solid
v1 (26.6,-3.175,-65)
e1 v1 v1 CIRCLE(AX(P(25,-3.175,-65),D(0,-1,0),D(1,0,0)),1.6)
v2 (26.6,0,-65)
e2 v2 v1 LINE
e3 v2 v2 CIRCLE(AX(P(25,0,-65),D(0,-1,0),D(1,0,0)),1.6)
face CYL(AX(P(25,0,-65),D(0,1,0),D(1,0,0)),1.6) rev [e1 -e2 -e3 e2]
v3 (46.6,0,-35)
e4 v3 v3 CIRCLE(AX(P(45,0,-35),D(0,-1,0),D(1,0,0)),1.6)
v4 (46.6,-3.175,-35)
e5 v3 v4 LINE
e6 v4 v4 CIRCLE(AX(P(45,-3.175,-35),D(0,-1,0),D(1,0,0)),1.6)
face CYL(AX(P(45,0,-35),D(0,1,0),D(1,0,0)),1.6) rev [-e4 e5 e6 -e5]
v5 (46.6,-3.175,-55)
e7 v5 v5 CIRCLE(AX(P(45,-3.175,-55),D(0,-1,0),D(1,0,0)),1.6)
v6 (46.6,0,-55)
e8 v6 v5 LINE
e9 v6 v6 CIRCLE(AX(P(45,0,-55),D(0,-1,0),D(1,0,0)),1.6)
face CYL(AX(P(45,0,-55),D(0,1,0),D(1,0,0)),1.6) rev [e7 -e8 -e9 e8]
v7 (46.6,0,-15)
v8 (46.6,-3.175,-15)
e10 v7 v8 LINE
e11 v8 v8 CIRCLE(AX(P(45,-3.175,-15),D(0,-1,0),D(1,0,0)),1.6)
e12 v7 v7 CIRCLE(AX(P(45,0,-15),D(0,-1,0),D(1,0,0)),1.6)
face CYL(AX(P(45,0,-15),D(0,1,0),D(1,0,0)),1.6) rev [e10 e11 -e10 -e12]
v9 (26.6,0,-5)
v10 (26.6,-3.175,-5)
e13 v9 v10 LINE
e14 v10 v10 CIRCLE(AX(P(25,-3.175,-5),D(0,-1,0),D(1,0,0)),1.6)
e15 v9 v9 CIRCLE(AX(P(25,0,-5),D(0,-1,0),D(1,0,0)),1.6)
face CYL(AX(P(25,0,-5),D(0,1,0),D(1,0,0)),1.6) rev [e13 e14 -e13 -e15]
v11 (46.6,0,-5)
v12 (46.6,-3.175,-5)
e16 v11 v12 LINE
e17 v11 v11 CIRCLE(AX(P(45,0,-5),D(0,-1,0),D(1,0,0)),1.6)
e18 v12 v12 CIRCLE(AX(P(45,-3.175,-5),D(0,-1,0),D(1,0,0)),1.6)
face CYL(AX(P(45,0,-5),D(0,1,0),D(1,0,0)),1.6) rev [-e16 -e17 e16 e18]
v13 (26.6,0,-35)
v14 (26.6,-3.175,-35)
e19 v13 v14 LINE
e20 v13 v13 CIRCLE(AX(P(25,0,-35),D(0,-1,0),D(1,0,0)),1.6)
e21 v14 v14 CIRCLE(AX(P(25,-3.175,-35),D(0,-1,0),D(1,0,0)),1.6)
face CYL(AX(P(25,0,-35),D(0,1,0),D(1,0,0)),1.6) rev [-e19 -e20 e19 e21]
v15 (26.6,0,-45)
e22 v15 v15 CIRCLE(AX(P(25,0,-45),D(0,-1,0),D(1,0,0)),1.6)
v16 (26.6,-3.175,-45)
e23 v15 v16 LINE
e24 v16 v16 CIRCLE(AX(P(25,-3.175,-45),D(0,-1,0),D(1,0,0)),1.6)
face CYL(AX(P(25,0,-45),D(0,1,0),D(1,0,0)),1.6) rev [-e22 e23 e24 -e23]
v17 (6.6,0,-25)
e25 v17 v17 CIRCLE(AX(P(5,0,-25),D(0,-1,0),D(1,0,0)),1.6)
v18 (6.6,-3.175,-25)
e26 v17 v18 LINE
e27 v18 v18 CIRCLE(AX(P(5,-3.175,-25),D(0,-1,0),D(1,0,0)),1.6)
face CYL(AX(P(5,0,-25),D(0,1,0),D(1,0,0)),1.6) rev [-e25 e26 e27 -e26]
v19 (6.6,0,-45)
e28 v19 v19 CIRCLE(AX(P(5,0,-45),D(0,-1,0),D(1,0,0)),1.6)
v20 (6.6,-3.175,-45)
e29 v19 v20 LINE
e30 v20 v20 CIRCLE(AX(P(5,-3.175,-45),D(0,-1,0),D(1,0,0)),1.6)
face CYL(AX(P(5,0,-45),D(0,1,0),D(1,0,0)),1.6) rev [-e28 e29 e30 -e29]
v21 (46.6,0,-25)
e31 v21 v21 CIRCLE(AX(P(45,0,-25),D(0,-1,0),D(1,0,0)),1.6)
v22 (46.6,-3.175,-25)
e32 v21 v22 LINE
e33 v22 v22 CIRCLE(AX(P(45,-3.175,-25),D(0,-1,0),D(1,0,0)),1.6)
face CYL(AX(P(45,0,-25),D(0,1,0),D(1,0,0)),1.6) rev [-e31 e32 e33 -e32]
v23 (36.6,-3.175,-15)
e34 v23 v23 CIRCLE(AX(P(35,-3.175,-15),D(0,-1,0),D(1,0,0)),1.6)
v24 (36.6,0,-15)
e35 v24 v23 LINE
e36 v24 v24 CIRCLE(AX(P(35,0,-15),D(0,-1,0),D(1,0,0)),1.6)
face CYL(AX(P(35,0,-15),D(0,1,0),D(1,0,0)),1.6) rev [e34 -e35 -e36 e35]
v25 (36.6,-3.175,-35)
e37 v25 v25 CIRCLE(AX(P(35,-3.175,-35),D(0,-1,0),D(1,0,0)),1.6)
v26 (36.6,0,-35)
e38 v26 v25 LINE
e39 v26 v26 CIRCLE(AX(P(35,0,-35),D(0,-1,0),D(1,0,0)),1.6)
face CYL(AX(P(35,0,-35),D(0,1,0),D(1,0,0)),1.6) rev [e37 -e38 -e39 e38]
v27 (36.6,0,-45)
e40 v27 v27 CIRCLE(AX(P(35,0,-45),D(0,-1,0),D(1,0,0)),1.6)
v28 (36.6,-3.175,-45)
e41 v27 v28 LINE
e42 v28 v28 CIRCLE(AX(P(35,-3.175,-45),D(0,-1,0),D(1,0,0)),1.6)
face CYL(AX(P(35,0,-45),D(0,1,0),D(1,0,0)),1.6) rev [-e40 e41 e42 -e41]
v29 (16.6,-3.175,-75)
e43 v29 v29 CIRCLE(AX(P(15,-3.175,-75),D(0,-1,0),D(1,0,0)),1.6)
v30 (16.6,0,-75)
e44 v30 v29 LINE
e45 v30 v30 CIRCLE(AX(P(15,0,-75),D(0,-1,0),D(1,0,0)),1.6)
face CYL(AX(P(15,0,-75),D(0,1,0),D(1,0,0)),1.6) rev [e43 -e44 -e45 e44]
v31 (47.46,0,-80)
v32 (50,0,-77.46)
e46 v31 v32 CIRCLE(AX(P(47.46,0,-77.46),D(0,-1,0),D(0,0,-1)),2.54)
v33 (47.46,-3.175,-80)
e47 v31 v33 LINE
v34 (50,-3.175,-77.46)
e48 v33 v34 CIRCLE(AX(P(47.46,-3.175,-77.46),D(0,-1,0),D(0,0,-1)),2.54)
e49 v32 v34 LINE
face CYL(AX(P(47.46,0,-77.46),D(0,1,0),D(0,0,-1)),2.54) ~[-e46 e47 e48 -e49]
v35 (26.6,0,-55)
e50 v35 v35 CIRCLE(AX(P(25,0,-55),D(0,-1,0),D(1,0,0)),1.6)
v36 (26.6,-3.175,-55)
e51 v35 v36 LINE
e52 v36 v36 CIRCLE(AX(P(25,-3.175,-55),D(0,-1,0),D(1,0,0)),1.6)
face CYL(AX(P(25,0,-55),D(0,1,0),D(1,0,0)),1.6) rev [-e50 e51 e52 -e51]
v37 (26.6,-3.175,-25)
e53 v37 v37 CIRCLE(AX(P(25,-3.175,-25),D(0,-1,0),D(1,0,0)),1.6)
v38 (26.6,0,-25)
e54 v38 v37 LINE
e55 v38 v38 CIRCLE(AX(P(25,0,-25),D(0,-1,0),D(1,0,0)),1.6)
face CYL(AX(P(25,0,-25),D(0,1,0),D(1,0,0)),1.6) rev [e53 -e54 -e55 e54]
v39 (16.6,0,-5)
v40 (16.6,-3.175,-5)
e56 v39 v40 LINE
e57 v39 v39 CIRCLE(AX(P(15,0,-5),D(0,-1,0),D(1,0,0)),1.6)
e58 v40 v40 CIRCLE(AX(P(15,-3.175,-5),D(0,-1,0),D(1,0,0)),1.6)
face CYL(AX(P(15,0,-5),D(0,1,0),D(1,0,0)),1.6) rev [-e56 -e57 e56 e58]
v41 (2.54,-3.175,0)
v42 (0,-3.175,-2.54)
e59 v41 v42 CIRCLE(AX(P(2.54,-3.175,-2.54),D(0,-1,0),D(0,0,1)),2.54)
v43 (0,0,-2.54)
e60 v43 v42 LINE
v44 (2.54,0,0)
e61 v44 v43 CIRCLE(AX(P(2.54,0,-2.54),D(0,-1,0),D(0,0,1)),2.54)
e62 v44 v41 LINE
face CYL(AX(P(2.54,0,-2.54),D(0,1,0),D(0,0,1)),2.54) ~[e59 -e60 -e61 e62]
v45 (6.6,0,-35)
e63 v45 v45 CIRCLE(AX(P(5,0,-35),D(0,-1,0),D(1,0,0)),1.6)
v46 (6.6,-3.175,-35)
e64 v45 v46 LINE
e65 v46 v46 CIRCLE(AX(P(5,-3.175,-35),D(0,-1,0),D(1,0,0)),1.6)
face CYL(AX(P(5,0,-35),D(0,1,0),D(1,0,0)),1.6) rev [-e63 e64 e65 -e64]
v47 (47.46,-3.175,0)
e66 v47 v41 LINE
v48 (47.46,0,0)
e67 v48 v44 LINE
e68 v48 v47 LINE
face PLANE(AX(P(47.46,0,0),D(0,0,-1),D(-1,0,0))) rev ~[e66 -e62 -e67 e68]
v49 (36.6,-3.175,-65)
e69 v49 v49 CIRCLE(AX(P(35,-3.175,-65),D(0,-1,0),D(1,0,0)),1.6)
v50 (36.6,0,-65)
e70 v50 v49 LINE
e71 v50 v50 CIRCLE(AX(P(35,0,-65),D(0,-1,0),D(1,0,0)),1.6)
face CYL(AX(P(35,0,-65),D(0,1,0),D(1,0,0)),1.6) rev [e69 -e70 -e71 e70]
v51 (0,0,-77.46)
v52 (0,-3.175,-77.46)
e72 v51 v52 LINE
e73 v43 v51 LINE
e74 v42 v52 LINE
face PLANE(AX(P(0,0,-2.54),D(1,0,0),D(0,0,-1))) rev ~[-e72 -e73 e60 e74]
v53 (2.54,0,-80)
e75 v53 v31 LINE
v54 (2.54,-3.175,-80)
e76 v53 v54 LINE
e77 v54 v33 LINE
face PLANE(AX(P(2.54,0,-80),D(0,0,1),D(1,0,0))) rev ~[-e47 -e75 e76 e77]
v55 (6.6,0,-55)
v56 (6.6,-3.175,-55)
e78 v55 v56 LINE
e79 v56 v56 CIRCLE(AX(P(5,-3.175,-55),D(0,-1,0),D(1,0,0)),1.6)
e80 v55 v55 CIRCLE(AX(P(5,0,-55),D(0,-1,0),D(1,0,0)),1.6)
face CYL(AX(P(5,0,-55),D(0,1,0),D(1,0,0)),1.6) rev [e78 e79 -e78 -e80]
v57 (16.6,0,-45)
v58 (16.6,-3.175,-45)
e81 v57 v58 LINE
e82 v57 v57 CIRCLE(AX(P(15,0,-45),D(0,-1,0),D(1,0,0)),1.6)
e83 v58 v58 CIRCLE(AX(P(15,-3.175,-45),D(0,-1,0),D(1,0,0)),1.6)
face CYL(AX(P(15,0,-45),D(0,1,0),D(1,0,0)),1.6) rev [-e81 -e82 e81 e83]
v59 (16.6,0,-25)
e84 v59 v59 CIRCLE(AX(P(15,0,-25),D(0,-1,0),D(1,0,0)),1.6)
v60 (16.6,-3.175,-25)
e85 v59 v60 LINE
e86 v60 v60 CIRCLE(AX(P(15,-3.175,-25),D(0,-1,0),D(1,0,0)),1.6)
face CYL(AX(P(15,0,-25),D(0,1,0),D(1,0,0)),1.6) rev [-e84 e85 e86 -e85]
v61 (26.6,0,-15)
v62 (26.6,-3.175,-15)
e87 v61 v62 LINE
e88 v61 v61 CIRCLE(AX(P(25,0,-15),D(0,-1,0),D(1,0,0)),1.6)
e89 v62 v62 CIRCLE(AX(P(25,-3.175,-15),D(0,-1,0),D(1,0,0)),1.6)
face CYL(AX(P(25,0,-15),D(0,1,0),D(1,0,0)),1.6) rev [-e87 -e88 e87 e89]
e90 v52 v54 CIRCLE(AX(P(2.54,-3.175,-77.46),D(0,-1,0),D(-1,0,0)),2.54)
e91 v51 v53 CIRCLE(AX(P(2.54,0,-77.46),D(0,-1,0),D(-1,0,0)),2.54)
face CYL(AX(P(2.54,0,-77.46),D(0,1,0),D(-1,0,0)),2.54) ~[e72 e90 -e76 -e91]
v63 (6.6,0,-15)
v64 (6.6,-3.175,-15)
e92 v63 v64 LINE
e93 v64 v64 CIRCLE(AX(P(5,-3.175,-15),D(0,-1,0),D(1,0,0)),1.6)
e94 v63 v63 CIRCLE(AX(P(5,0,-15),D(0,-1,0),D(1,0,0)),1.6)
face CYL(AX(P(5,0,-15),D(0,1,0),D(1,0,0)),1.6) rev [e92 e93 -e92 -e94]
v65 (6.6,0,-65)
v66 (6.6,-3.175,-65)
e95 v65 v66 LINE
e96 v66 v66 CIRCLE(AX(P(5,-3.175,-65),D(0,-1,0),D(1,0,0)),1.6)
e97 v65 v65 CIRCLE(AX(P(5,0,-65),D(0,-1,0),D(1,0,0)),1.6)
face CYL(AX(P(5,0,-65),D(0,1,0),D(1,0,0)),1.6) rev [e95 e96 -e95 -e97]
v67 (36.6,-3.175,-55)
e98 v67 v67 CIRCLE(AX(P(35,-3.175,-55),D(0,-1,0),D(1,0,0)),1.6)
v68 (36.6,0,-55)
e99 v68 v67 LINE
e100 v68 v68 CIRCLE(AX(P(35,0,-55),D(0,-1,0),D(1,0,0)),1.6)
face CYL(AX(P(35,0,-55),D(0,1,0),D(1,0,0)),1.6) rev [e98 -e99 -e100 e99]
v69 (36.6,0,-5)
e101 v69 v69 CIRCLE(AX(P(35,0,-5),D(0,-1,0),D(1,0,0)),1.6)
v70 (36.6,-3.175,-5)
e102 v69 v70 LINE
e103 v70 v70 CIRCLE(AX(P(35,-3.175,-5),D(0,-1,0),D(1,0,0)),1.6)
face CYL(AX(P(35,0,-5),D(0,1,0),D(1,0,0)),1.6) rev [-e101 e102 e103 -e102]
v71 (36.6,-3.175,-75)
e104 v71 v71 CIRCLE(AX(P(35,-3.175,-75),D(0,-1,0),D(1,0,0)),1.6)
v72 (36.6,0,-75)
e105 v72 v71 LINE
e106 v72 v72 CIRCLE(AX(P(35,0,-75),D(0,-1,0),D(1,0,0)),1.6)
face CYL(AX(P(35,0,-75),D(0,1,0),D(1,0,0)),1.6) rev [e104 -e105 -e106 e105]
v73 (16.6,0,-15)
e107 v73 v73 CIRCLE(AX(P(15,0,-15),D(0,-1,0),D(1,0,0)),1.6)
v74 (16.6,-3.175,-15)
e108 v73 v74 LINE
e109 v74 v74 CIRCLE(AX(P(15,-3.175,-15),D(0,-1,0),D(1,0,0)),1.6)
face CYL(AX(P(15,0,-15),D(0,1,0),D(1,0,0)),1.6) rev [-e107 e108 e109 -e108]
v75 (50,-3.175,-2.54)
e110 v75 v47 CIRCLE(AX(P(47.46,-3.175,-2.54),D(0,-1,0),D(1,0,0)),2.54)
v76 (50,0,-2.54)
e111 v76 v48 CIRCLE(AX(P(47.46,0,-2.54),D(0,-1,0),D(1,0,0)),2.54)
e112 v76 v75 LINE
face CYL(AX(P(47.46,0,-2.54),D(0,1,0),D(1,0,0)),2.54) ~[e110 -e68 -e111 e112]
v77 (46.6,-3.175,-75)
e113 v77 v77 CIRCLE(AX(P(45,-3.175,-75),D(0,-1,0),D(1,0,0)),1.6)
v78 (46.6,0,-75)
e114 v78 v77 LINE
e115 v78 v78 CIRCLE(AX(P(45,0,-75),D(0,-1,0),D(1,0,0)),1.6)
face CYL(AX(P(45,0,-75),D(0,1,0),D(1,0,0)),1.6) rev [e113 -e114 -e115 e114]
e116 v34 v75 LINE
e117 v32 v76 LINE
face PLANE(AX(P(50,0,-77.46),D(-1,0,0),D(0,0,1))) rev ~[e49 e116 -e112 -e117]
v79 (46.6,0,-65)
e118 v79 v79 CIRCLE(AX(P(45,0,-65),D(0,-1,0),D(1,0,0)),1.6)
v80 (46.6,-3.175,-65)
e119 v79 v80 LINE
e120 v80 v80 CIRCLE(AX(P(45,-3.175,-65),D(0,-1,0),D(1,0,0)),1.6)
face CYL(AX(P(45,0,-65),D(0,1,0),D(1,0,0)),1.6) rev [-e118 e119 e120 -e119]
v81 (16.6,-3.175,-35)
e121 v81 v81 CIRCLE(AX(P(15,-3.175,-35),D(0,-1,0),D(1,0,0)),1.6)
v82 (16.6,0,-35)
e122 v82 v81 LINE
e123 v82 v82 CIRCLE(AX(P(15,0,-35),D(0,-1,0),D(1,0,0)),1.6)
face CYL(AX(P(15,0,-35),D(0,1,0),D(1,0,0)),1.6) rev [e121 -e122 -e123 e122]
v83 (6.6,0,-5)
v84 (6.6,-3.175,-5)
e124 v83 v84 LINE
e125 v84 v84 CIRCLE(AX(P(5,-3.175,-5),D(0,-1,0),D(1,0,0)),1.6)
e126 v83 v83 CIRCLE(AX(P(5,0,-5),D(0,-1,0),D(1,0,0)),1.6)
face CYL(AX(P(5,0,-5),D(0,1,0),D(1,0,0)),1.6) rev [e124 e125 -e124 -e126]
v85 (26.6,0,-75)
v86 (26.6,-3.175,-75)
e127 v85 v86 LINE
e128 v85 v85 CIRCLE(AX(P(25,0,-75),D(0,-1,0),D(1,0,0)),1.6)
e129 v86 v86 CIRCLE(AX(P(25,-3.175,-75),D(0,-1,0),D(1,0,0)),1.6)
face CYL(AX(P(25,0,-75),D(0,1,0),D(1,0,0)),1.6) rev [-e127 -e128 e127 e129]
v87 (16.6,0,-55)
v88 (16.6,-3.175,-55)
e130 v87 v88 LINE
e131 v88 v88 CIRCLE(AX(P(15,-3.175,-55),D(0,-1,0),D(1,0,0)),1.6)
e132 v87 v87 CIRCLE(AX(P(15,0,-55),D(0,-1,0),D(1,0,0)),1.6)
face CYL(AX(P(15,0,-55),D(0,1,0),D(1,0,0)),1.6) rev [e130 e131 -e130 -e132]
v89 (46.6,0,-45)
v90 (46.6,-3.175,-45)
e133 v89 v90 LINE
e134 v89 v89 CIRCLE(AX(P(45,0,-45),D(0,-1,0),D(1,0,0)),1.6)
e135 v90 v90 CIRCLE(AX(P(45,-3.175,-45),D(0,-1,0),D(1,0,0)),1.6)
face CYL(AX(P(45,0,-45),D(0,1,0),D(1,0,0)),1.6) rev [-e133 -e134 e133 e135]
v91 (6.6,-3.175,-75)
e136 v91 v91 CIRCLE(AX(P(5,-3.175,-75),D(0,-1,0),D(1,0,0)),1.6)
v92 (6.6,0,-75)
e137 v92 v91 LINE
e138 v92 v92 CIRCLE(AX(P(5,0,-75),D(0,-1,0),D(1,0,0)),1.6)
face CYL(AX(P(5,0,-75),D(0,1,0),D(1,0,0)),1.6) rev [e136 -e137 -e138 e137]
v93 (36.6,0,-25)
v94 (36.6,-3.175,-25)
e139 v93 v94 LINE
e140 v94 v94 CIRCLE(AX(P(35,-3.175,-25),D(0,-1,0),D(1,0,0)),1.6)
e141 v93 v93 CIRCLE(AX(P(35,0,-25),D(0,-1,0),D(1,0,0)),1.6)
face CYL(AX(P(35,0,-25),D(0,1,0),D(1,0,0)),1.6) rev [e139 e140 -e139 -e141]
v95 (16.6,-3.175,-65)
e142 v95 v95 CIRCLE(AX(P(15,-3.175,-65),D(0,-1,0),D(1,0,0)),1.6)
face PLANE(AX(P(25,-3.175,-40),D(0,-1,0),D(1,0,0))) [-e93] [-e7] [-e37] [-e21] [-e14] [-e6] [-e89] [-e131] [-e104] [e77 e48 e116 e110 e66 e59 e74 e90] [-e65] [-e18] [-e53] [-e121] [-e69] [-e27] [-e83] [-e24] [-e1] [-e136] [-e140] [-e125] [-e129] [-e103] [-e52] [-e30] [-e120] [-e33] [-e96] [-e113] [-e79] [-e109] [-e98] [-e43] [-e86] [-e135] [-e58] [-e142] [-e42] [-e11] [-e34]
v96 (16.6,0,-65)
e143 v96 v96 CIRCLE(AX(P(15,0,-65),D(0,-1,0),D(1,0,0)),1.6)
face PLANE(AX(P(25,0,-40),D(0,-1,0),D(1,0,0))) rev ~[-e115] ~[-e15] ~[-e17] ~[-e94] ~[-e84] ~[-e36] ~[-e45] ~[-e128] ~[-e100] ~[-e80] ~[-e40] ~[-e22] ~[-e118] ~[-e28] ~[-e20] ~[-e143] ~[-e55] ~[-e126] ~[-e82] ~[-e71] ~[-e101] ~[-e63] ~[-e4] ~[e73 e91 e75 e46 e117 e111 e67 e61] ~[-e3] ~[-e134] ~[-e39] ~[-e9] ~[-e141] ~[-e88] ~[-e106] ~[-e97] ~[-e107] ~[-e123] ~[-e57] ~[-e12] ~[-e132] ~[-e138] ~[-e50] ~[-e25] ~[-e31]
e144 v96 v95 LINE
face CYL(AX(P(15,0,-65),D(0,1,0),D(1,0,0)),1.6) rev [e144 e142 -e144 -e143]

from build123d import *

# Parameters (mm, degrees)
F0_R     = 1.6
F1_DEPTH = 3.175


# Not quite as in the source:
# - a length typed as a fraction of an inch, garbled in the dataset ("3 / 203.2 mm" for 3/8 in), is restored


with BuildPart() as f1:
    # F0 (on Front) → F1 (new body)
    with BuildSketch(Plane.XZ):
        with BuildLine():
            Line((47.46, 0), (2.54, 0))
            ThreePointArc((2.54, 0), (0.7439487758, -0.7439487758), (0, -2.54))
            Line((0, -2.54), (0, -77.46))
            ThreePointArc((0, -77.46), (0.7439487758, -79.2560512242), (2.54, -80))
            Line((2.54, -80), (47.46, -80))
            ThreePointArc((47.46, -80), (49.2560512242, -79.2560512242), (50, -77.46))
            Line((50, -77.46), (50, -2.54))
            ThreePointArc((50, -2.54), (49.2560512242, -0.7439487758), (47.46, 0))
        make_face()
        with Locations((5, -75)):
            Circle(F0_R, mode=Mode.SUBTRACT)
        with Locations((5, -65)):
            Circle(F0_R, mode=Mode.SUBTRACT)
        with Locations((15, -75)):
            Circle(F0_R, mode=Mode.SUBTRACT)
        with Locations((15, -65)):
            Circle(F0_R, mode=Mode.SUBTRACT)
        with Locations((5, -55)):
            Circle(F0_R, mode=Mode.SUBTRACT)
        with Locations((5, -45)):
            Circle(F0_R, mode=Mode.SUBTRACT)
        with Locations((15, -55)):
            Circle(F0_R, mode=Mode.SUBTRACT)
        with Locations((15, -45)):
            Circle(F0_R, mode=Mode.SUBTRACT)
        with Locations((25, -75)):
            Circle(F0_R, mode=Mode.SUBTRACT)
        with Locations((35, -75)):
            Circle(F0_R, mode=Mode.SUBTRACT)
        with Locations((25, -65)):
            Circle(F0_R, mode=Mode.SUBTRACT)
        with Locations((35, -65)):
            Circle(F0_R, mode=Mode.SUBTRACT)
        with Locations((45, -75)):
            Circle(F0_R, mode=Mode.SUBTRACT)
        with Locations((45, -65)):
            Circle(F0_R, mode=Mode.SUBTRACT)
        with Locations((25, -55)):
            Circle(F0_R, mode=Mode.SUBTRACT)
        with Locations((35, -55)):
            Circle(F0_R, mode=Mode.SUBTRACT)
        with Locations((25, -45)):
            Circle(F0_R, mode=Mode.SUBTRACT)
        with Locations((35, -45)):
            Circle(F0_R, mode=Mode.SUBTRACT)
        with Locations((45, -55)):
            Circle(F0_R, mode=Mode.SUBTRACT)
        with Locations((45, -45)):
            Circle(F0_R, mode=Mode.SUBTRACT)
        with Locations((5, -35)):
            Circle(F0_R, mode=Mode.SUBTRACT)
        with Locations((5, -25)):
            Circle(F0_R, mode=Mode.SUBTRACT)
        with Locations((15, -35)):
            Circle(F0_R, mode=Mode.SUBTRACT)
        with Locations((15, -25)):
            Circle(F0_R, mode=Mode.SUBTRACT)
        with Locations((5, -15)):
            Circle(F0_R, mode=Mode.SUBTRACT)
        with Locations((5, -5)):
            Circle(F0_R, mode=Mode.SUBTRACT)
        with Locations((15, -15)):
            Circle(F0_R, mode=Mode.SUBTRACT)
        with Locations((15, -5)):
            Circle(F0_R, mode=Mode.SUBTRACT)
        with Locations((25, -35)):
            Circle(F0_R, mode=Mode.SUBTRACT)
        with Locations((35, -35)):
            Circle(F0_R, mode=Mode.SUBTRACT)
        with Locations((25, -25)):
            Circle(F0_R, mode=Mode.SUBTRACT)
        with Locations((35, -25)):
            Circle(F0_R, mode=Mode.SUBTRACT)
        with Locations((45, -35)):
            Circle(F0_R, mode=Mode.SUBTRACT)
        with Locations((45, -25)):
            Circle(F0_R, mode=Mode.SUBTRACT)
        with Locations((25, -15)):
            Circle(F0_R, mode=Mode.SUBTRACT)
        with Locations((35, -15)):
            Circle(F0_R, mode=Mode.SUBTRACT)
        with Locations((25, -5)):
            Circle(F0_R, mode=Mode.SUBTRACT)
        with Locations((35, -5)):
            Circle(F0_R, mode=Mode.SUBTRACT)
        with Locations((45, -15)):
            Circle(F0_R, mode=Mode.SUBTRACT)
        with Locations((45, -5)):
            Circle(F0_R, mode=Mode.SUBTRACT)
    extrude(amount=F1_DEPTH)


solid = f1.part
